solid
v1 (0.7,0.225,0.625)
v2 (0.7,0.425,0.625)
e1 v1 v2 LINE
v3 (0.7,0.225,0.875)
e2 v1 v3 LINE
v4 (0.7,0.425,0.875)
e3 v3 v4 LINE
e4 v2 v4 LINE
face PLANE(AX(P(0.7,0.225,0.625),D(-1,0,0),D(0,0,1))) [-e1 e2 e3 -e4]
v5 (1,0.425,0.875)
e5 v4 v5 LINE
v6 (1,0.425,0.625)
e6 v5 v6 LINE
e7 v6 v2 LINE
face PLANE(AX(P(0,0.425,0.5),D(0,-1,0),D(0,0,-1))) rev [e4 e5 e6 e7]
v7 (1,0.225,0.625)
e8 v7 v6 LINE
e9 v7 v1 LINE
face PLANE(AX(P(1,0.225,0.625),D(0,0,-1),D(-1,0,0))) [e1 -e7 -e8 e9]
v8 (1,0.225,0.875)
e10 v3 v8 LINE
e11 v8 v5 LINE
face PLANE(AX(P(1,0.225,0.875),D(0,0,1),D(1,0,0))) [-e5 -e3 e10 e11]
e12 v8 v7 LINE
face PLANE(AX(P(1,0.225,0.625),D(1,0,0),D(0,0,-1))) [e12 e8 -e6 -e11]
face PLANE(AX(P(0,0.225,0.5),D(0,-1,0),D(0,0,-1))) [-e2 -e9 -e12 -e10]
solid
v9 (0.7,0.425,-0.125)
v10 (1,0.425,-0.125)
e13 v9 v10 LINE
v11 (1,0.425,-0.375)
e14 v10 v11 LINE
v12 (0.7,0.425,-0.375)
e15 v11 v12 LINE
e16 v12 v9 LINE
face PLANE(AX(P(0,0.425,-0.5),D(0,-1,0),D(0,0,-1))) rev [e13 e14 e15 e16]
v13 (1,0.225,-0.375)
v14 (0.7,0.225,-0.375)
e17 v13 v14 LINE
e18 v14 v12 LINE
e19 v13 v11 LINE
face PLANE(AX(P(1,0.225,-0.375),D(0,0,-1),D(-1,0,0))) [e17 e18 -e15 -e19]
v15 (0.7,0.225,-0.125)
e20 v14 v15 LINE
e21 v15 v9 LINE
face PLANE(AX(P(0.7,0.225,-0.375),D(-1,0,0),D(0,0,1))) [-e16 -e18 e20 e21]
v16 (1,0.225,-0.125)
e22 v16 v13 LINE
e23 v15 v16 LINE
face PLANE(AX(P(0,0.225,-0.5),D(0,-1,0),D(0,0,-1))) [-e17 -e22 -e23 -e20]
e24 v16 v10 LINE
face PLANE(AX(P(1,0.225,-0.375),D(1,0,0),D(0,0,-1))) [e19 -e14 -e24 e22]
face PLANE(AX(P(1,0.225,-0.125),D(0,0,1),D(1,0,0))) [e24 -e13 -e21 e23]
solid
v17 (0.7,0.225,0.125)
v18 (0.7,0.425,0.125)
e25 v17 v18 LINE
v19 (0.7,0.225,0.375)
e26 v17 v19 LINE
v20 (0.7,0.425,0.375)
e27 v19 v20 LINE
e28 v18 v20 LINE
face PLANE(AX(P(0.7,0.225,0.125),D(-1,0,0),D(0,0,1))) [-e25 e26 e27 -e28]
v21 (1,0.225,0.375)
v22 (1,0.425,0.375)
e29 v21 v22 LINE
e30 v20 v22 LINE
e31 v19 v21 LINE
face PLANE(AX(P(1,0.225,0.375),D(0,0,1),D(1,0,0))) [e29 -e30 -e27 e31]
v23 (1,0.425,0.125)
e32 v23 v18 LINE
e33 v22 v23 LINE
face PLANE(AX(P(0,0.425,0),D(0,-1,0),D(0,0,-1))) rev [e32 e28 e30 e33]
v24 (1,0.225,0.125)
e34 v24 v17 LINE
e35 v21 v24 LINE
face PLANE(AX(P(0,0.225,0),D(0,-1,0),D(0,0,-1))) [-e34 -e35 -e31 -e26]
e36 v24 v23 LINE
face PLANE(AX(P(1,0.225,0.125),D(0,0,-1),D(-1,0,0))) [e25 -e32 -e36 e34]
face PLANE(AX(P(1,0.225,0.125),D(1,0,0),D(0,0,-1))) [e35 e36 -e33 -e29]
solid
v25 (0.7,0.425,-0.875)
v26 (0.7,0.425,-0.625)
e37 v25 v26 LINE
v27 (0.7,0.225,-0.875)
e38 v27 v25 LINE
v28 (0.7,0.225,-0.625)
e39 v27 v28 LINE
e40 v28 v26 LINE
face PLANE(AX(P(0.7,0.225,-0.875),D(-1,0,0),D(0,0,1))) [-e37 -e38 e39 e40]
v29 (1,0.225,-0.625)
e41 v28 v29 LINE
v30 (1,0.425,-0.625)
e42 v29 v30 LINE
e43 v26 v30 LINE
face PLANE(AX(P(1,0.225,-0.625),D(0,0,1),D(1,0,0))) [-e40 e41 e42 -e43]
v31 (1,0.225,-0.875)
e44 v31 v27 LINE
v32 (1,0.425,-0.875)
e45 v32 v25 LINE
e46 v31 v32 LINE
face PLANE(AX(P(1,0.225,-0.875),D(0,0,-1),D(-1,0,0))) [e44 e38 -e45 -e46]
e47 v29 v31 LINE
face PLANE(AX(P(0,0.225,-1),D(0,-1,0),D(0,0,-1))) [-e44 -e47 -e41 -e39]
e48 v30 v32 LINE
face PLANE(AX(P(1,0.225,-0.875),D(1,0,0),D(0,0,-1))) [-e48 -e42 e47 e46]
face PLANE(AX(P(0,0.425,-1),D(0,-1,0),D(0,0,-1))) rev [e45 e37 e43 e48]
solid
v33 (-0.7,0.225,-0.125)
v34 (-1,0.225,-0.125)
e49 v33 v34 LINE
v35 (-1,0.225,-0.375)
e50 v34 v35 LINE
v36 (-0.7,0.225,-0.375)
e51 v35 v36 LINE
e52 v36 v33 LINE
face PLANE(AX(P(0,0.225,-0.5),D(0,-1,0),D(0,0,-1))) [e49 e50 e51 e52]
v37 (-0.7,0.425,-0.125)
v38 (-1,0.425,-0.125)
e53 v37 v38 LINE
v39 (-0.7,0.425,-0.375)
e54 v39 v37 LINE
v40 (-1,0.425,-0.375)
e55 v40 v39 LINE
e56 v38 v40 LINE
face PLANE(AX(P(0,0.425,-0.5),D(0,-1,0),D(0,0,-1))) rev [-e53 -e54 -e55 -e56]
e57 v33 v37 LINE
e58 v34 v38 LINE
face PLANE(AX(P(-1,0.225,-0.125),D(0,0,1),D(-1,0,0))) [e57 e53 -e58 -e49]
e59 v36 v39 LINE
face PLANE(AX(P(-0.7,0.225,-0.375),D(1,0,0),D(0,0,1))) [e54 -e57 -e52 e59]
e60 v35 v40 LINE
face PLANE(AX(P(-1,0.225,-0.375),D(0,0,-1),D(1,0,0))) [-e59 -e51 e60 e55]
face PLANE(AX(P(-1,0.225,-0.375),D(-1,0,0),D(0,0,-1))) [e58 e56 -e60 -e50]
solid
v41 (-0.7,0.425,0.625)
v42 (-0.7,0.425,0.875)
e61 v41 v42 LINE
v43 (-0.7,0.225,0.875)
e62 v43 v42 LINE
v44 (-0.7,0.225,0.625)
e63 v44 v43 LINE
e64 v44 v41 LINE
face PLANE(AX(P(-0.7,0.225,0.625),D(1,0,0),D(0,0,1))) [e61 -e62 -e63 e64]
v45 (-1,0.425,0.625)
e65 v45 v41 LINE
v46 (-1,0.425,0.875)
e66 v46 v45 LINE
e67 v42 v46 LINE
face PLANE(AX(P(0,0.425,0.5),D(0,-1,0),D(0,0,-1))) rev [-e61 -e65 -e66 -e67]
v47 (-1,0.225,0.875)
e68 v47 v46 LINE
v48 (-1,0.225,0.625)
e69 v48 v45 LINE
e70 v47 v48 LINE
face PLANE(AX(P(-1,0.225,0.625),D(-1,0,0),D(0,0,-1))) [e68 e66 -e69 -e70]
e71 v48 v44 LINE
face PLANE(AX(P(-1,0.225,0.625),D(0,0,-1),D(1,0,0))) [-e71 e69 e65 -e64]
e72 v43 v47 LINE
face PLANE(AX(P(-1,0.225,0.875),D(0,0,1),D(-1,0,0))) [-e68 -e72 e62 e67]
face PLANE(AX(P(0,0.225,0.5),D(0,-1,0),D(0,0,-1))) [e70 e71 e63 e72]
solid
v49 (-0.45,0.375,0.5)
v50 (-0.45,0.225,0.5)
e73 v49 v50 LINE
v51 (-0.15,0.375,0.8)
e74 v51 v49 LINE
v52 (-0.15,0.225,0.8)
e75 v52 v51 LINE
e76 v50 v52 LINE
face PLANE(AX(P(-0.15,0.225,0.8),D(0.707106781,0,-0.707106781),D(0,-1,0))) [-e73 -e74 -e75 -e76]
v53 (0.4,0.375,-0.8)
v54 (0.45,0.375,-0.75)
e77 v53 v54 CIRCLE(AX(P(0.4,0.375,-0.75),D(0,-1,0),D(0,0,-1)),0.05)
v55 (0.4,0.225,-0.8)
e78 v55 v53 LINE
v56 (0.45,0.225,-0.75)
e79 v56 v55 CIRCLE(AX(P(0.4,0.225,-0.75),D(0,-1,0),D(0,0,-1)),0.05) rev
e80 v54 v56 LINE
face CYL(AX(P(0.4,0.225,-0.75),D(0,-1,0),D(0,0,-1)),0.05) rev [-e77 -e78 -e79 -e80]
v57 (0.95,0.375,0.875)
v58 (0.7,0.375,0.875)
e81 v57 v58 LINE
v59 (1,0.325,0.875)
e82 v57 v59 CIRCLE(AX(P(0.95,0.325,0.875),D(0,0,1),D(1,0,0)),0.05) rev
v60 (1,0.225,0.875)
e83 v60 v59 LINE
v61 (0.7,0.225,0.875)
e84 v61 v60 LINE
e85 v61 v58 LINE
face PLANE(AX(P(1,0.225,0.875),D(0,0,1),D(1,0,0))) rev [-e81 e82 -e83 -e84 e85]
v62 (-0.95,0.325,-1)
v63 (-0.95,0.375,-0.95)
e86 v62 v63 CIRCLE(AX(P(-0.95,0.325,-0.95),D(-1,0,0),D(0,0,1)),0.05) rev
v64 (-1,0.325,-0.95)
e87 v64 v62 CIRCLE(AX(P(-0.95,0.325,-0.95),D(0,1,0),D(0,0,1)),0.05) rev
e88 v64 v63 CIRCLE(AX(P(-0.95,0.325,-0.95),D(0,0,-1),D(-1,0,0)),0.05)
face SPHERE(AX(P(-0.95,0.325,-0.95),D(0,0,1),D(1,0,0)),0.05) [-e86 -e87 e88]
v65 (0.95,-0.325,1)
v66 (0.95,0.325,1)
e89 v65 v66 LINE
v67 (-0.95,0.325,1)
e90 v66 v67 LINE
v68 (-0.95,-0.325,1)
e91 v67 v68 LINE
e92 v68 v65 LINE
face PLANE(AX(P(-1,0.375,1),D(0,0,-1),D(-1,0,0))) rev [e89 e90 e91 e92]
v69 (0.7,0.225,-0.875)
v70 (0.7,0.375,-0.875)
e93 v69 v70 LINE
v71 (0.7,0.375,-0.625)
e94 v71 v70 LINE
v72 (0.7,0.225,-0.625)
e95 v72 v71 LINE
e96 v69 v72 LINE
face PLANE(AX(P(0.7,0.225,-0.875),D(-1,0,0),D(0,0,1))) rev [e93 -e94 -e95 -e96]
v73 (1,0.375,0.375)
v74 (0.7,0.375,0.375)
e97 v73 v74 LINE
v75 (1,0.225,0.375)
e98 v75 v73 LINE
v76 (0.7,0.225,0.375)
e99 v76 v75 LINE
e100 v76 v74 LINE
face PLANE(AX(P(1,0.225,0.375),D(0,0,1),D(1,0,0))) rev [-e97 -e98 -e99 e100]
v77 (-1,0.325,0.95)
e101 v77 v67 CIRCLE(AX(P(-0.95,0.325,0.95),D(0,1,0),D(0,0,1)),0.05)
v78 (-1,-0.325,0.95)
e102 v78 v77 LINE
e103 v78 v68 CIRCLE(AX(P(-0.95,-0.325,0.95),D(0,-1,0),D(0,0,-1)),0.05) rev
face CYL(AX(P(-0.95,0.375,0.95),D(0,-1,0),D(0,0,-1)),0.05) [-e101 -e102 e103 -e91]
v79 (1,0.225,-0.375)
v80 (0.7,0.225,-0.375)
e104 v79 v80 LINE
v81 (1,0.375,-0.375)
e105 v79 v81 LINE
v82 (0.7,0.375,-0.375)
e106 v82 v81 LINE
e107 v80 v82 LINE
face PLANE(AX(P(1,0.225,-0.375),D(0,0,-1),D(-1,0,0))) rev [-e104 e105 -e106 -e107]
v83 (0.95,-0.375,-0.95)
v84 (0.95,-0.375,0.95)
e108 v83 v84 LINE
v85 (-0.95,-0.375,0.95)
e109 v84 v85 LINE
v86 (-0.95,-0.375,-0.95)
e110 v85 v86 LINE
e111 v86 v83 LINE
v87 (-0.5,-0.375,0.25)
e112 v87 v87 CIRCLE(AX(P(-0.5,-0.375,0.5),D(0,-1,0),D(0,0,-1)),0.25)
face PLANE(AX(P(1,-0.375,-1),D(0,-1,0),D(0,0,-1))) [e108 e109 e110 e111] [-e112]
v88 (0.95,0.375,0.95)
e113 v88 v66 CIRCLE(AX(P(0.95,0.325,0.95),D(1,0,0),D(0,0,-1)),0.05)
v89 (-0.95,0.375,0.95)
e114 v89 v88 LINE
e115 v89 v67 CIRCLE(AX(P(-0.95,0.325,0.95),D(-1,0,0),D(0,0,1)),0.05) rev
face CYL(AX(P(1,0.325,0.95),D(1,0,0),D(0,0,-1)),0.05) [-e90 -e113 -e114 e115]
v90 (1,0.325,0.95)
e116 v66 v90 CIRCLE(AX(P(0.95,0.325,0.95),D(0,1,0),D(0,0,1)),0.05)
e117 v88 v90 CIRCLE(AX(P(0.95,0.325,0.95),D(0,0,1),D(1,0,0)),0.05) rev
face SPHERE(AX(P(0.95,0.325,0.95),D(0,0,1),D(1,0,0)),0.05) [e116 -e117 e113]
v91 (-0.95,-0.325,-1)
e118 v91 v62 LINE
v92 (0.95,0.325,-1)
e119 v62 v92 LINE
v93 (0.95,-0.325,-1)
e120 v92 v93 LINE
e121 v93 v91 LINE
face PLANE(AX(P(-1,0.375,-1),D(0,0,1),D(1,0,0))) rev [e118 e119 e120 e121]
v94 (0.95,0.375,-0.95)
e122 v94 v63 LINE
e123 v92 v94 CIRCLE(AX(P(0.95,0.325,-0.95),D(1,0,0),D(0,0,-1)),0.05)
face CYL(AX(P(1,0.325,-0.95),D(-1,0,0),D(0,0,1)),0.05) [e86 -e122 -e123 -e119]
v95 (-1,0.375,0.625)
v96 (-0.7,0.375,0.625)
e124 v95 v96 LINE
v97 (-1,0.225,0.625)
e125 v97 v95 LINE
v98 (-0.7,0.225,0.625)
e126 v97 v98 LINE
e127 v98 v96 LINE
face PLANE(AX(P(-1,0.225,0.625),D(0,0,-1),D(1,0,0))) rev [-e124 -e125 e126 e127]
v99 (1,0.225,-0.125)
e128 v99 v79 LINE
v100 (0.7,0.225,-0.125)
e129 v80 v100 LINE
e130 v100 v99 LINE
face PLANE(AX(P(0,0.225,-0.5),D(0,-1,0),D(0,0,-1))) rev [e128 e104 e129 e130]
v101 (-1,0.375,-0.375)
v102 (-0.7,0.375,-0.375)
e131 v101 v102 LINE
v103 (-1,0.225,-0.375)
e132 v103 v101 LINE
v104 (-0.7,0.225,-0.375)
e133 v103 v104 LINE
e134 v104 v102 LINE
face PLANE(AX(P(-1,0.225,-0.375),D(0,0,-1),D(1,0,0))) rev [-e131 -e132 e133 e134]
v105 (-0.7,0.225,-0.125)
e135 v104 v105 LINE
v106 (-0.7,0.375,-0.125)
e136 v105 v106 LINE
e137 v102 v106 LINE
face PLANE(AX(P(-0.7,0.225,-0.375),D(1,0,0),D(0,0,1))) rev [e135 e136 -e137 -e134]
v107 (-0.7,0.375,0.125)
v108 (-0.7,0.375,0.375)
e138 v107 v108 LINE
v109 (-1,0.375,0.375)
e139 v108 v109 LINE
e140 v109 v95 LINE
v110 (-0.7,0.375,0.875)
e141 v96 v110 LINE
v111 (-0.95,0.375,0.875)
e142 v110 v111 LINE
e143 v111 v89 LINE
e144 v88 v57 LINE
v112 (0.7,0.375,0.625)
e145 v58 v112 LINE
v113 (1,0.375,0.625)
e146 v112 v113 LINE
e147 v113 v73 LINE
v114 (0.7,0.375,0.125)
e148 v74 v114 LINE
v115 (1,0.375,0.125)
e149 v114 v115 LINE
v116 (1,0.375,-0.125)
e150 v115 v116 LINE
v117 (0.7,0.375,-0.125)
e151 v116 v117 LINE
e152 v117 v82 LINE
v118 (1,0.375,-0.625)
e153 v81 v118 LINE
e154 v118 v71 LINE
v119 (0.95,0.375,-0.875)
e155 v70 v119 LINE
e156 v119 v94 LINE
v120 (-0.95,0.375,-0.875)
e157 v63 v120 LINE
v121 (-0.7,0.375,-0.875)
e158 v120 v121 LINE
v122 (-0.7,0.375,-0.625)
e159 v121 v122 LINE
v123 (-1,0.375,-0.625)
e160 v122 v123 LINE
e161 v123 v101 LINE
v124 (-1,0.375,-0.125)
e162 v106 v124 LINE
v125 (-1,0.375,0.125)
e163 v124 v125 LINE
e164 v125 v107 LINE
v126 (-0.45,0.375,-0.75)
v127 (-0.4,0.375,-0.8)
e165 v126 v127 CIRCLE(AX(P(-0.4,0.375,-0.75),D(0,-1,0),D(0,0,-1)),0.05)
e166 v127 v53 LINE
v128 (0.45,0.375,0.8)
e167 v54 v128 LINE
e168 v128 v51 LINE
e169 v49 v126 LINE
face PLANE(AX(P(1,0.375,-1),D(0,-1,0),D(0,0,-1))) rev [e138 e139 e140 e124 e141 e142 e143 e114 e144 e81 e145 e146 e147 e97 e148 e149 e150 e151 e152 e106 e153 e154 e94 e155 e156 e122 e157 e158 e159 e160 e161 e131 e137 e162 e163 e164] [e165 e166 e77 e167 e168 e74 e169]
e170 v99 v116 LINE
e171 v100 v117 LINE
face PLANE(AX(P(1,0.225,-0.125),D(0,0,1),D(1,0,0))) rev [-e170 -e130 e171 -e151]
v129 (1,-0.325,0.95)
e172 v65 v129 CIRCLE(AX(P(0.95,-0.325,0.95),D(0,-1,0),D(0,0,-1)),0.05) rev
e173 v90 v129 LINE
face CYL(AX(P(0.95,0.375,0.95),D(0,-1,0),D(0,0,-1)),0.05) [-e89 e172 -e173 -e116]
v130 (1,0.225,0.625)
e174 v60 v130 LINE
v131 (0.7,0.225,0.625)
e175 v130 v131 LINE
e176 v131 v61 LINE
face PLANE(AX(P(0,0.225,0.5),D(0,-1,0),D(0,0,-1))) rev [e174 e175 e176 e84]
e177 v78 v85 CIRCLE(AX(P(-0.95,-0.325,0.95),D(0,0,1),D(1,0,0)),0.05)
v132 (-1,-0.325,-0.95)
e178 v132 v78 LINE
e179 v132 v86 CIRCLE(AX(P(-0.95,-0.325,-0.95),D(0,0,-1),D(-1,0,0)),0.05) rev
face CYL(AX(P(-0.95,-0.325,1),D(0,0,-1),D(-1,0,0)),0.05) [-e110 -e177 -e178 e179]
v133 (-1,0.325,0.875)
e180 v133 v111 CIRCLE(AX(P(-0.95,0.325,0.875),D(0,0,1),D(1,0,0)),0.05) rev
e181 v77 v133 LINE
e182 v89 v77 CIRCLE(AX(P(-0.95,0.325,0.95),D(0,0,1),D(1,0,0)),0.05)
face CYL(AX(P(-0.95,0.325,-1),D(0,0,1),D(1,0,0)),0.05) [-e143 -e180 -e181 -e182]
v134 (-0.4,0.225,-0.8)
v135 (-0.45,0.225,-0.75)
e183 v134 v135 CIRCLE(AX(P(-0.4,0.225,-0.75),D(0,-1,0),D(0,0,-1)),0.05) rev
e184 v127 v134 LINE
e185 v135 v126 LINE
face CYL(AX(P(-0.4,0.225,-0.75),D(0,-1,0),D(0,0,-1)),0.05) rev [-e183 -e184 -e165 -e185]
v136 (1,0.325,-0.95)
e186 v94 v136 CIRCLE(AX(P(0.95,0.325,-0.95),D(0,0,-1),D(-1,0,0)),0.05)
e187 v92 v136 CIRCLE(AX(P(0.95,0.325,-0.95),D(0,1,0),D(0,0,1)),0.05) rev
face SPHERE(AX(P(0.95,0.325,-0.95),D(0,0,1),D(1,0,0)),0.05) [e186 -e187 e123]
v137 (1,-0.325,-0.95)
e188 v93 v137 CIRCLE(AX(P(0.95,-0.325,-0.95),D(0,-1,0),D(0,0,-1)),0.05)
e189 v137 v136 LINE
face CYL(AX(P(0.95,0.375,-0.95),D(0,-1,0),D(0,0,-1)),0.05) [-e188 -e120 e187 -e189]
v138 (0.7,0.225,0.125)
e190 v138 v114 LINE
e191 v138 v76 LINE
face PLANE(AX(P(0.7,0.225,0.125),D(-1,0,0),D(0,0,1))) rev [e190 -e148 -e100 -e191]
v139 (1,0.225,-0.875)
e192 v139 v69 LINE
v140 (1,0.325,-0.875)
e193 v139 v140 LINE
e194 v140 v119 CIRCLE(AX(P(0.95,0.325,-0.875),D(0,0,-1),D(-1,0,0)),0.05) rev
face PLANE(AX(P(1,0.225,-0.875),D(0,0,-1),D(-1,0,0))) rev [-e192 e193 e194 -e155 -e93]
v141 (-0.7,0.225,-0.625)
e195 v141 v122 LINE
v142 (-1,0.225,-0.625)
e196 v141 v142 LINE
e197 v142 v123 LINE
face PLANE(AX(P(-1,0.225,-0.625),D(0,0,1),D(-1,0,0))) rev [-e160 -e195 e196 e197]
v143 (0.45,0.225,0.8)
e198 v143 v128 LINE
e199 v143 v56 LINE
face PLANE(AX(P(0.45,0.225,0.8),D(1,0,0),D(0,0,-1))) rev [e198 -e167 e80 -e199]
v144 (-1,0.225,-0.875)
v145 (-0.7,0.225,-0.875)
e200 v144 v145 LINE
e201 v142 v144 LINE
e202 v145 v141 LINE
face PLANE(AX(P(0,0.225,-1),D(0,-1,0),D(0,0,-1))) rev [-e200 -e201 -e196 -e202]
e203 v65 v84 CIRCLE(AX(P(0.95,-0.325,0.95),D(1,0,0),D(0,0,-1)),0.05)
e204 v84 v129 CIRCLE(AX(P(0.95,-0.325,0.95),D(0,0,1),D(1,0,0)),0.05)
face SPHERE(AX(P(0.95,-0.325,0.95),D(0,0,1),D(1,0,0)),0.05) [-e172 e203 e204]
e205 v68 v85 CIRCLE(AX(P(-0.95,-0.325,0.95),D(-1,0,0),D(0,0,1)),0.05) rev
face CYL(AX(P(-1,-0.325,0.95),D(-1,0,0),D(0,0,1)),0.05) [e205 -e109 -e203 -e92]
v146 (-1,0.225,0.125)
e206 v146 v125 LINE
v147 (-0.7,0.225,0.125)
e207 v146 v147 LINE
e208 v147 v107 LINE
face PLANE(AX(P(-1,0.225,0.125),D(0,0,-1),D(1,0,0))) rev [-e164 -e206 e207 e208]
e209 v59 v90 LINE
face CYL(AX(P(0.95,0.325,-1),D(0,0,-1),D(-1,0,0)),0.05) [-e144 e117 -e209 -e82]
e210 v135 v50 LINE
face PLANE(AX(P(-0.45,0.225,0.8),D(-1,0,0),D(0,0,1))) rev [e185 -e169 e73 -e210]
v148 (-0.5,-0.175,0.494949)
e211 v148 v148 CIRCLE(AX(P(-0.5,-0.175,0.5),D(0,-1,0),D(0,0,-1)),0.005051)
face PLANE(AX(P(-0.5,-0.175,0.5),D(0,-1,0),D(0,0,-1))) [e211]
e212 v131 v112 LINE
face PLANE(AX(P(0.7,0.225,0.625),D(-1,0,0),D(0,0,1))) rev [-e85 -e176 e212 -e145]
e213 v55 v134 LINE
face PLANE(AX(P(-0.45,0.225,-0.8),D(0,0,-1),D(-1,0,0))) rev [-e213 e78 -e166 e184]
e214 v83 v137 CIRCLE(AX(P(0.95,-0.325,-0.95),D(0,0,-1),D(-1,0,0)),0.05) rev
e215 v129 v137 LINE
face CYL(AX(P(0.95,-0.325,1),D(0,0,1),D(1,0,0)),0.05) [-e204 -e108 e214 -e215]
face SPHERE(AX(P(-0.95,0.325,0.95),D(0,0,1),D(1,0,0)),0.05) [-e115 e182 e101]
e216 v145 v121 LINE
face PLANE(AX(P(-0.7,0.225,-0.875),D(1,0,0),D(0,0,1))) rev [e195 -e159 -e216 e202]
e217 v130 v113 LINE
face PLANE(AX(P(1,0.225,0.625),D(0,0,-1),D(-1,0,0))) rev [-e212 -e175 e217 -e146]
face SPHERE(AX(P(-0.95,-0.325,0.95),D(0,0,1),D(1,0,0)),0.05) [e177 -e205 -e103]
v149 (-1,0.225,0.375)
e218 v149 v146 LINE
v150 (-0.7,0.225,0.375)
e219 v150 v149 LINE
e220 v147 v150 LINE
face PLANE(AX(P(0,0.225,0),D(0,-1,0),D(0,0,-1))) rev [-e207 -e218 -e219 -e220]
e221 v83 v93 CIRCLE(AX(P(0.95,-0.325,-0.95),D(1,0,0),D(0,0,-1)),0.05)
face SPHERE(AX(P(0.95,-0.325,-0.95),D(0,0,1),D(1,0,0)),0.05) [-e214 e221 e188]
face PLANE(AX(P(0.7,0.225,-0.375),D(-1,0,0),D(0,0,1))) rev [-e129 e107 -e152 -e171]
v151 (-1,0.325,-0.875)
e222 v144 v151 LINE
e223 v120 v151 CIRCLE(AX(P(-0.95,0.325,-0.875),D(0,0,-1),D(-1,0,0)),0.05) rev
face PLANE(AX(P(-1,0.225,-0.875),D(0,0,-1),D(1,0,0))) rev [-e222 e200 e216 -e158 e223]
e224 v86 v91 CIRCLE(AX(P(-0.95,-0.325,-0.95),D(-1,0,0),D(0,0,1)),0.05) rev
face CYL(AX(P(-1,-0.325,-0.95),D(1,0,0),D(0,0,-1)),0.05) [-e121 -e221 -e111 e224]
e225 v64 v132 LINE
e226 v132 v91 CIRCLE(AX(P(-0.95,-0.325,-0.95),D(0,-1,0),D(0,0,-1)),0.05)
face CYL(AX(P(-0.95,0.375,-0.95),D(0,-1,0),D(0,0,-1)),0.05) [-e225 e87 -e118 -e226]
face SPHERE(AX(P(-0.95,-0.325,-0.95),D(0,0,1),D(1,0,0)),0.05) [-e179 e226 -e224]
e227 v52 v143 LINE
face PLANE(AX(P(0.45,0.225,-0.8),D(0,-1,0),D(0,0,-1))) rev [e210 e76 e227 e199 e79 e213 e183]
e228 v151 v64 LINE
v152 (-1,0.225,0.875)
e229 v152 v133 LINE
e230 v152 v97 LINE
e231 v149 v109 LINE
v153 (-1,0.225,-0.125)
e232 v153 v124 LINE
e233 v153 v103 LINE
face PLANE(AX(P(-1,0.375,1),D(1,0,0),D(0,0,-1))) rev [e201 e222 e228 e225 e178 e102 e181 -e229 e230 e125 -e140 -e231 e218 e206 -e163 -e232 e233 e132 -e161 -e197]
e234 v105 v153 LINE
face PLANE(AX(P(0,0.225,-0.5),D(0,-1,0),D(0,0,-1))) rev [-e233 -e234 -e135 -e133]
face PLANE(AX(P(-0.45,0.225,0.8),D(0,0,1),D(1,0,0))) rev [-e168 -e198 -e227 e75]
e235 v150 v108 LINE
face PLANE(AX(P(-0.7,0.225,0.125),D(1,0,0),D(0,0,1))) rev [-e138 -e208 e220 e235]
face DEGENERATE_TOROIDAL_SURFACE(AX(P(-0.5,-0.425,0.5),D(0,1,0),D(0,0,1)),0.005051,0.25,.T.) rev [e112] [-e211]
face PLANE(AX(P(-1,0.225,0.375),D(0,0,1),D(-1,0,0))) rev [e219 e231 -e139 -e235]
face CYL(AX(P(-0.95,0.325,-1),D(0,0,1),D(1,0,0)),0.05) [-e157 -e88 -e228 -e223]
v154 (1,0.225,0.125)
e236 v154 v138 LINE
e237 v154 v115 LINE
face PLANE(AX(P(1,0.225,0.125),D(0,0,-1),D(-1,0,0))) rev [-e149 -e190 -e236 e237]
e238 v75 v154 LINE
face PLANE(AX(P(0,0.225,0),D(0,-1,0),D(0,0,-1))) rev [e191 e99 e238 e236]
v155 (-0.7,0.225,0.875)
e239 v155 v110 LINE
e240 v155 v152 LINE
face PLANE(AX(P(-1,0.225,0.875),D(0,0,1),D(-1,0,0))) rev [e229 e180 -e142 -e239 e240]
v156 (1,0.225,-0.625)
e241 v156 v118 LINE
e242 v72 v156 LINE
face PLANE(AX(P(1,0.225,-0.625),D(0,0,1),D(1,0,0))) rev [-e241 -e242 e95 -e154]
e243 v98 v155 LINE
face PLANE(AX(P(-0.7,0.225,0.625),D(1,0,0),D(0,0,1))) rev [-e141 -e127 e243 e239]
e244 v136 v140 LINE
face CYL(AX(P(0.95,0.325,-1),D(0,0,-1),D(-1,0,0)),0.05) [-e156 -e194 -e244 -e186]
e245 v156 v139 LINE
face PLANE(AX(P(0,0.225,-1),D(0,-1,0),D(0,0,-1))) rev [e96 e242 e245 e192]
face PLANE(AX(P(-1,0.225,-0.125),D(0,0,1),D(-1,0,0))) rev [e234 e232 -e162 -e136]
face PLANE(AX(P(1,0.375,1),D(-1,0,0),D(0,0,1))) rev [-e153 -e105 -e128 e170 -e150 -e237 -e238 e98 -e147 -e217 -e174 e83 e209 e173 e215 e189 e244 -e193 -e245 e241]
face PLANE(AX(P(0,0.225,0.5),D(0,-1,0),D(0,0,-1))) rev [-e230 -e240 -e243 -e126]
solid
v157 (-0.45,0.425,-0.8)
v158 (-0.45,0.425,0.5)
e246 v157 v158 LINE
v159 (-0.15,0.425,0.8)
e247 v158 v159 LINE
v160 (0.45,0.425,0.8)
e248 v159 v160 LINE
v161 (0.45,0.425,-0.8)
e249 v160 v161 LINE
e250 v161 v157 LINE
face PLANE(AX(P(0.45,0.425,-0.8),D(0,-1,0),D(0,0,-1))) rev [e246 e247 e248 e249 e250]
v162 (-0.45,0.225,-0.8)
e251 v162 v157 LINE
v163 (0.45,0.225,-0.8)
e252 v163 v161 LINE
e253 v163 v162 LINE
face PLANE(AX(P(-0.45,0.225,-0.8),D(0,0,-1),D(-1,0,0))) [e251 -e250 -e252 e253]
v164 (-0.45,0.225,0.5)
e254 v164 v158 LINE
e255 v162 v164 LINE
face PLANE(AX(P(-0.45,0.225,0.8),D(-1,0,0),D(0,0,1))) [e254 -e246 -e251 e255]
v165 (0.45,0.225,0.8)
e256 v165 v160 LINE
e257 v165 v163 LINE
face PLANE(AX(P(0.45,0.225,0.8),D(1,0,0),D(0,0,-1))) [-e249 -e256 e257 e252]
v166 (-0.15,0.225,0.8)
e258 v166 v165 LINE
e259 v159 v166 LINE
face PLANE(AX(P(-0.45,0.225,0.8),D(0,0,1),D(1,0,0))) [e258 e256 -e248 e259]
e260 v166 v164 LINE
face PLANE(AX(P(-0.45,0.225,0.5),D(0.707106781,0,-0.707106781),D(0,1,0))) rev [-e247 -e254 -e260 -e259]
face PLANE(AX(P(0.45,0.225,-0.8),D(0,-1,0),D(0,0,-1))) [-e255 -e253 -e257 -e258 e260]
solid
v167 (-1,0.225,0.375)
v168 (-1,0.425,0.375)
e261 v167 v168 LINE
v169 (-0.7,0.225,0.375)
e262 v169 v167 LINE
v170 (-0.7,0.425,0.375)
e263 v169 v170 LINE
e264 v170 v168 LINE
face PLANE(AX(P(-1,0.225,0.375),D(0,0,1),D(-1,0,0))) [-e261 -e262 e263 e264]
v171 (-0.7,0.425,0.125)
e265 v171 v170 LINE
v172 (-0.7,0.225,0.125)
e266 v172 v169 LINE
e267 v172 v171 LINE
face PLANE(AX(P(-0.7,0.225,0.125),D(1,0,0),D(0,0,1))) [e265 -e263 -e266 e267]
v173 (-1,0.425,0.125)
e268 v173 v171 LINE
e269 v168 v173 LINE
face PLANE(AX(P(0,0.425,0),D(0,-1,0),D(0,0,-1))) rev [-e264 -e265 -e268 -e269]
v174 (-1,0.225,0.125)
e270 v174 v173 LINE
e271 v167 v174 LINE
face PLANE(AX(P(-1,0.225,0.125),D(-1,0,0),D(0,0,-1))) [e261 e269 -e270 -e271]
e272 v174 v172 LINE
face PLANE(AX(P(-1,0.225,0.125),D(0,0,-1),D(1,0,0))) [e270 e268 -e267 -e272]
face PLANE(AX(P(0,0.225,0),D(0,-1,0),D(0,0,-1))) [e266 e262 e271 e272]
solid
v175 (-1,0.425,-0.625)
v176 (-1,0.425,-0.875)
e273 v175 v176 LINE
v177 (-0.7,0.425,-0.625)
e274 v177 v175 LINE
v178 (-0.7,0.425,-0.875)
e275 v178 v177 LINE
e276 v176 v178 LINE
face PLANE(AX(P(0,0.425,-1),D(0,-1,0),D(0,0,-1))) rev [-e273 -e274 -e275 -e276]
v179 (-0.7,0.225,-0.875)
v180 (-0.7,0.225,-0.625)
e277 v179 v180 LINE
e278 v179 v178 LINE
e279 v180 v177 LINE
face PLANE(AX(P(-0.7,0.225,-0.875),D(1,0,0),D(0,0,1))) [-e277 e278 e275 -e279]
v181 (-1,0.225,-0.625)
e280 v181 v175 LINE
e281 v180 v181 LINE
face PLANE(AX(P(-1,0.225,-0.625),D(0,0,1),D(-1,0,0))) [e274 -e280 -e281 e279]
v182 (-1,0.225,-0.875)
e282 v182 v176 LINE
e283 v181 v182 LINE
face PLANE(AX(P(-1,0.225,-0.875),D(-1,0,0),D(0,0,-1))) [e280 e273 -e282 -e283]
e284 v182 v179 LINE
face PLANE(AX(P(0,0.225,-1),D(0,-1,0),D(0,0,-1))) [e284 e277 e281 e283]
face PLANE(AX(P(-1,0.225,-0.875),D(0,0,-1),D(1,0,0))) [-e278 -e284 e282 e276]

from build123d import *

# Parameters (mm, degrees)
SKETCH1_W                   = 2
SKETCH1_H                   = 2
EXTRUDE1_DEPTH              = 0.375
SKETCH3_W                   = 0.9
SKETCH3_H                   = 1.6
EXTRUDE3_DEPTH              = 0.2
BODY_MOVE_COPY2_START       = -0.45
BODY_MOVE_COPY2_OUTLINE_W   = 0.2
BODY_MOVE_COPY2_OUTLINE_H   = 1.6
BODY_MOVE_COPY2_DEPTH       = 0.9
SKETCH4_W                   = 0.3
SKETCH4_H                   = 0.25
BOSS_EXTRUDE1_DEPTH         = 0.2
LPATTERN1_COUNT             = 3
LPATTERN1_PITCH             = 0.5
LPATTERN1_COL_COUNT         = 2
LPATTERN1_COL_PITCH         = 0.5
BODY_MOVE_COPY3_START       = 0.7
BODY_MOVE_COPY3_OUTLINE_W   = 0.2
BODY_MOVE_COPY3_OUTLINE_H   = 0.25
BODY_MOVE_COPY3_DEPTH       = 0.3
BODY_MOVE_COPY3_2_OUTLINE_W = 0.2
BODY_MOVE_COPY3_2_OUTLINE_H = 0.25
BODY_MOVE_COPY3_2_DEPTH     = 0.3
BODY_MOVE_COPY3_3_OUTLINE_W = 0.2
BODY_MOVE_COPY3_3_OUTLINE_H = 0.25
BODY_MOVE_COPY3_3_DEPTH     = 0.3
BODY_MOVE_COPY3_4_OUTLINE_W = 0.2
BODY_MOVE_COPY3_4_OUTLINE_H = 0.25
BODY_MOVE_COPY3_4_DEPTH     = 0.3
BODY_MOVE_COPY3_START_2     = -1
BODY_MOVE_COPY3_5_OUTLINE_W = 0.2
BODY_MOVE_COPY3_5_OUTLINE_H = 0.25
BODY_MOVE_COPY3_5_DEPTH     = 0.3
BODY_MOVE_COPY3_6_OUTLINE_W = 0.2
BODY_MOVE_COPY3_6_OUTLINE_H = 0.25
BODY_MOVE_COPY3_6_DEPTH     = 0.3
BODY_MOVE_COPY3_7_OUTLINE_W = 0.2
BODY_MOVE_COPY3_7_OUTLINE_H = 0.25
BODY_MOVE_COPY3_7_DEPTH     = 0.3
BODY_MOVE_COPY3_8_OUTLINE_W = 0.2
BODY_MOVE_COPY3_8_OUTLINE_H = 0.25
BODY_MOVE_COPY3_8_DEPTH     = 0.3
FILLET_3_R                  = 0.05
FILLET1_R                   = 0.05
SKETCH_1_R                  = 0.25
CUT_EXTRUDE1_DEPTH          = 0.2
FILLET3_R                   = 0.25
CHAMFER1_SIZE               = 0.3
CHAMFER2_SIZE               = 0.3


with BuildPart() as part:
    # Sketch1 → Extrude1 (new, symmetric)
    with BuildSketch(Plane(origin=(0, 0, 0), x_dir=(1, 0, 0), z_dir=(0, 1, 0))):
        Rectangle(SKETCH1_W, SKETCH1_H)
    extrude(amount=EXTRUDE1_DEPTH, both=True)


with BuildPart() as body_2:
    # Sketch3 → Extrude3 (new body)
    with BuildSketch(Plane(origin=(0, 0.425, 0), x_dir=(1, 0, 0), z_dir=(0, 1, 0))):
        Rectangle(SKETCH3_W, SKETCH3_H)
    extrude(amount=-EXTRUDE3_DEPTH)


with BuildPart() as body_3:
    # Body-Move/Copy2: read off the stored shape, not the designer's step
    # Body-Move/Copy2 outline → Body-Move/Copy2 (new body)
    with BuildSketch(Plane.YZ.offset(BODY_MOVE_COPY2_START)):
        with Locations((0.325, 0)):
            Rectangle(BODY_MOVE_COPY2_OUTLINE_W, BODY_MOVE_COPY2_OUTLINE_H)
    extrude(amount=BODY_MOVE_COPY2_DEPTH)

    # Chamfer1
    chamfer1_edges = [body_3.edges().sort_by_distance(p)[0] for p in [
        (-0.45, 0.325, 0.8),
    ]]
    chamfer(chamfer1_edges, length=CHAMFER1_SIZE)


with BuildPart() as part_1:
    add(part.part)

    # Combine2: cut body 2
    add(body_2.part, mode=Mode.SUBTRACT)


with BuildPart() as body_3_2:
    # Sketch4 → Boss-Extrude1 (new body)
    with BuildSketch(Plane(origin=(0, 0.425, 0), x_dir=(-1, 0, 0), z_dir=(0, 1, 0))):
        with Locations((-0.85, 0.25)):
            Rectangle(SKETCH4_W, SKETCH4_H)
    boss_extrude1 = extrude(amount=-BOSS_EXTRUDE1_DEPTH)


with BuildPart() as lpattern1_1:
    # LPattern1: pattern copy
    add(boss_extrude1.moved(Location(Vector(0, 0, -1) * (1 * LPATTERN1_PITCH))))


with BuildPart() as lpattern1_2:
    # LPattern1: pattern copy
    add(boss_extrude1.moved(Location(Vector(0, 0, -1) * (2 * LPATTERN1_PITCH))))


with BuildPart() as lpattern1_col_1:
    # LPattern1 col: Boss-Extrude1 ×2
    with Locations(*[(0, 0, i * LPATTERN1_COL_PITCH) for i in range(1, LPATTERN1_COL_COUNT)]):
        add(boss_extrude1)


with BuildPart() as body_7:
    # Mirror2: mirrored copy
    add(lpattern1_2.part.mirror(Plane(origin=(0, 0, 0), x_dir=(0, 0, 1), z_dir=(1, 0, 0))))


with BuildPart() as body_8:
    # Mirror2 2: mirrored copy
    add(lpattern1_1.part.mirror(Plane(origin=(0, 0, 0), x_dir=(0, 0, 1), z_dir=(1, 0, 0))))


with BuildPart() as body_9:
    # Mirror2 3: mirrored copy
    add(body_3_2.part.mirror(Plane(origin=(0, 0, 0), x_dir=(0, 0, 1), z_dir=(1, 0, 0))))


with BuildPart() as body_10:
    # Mirror2 4: mirrored copy
    add(lpattern1_col_1.part.mirror(Plane(origin=(0, 0, 0), x_dir=(0, 0, 1), z_dir=(1, 0, 0))))


with BuildPart() as body_11:
    # Body-Move/Copy3: read off the stored shape, not the designer's step
    # Body-Move/Copy3 outline → Body-Move/Copy3 (new body)
    with BuildSketch(Plane.YZ.offset(BODY_MOVE_COPY3_START)):
        with Locations((0.325, -0.75)):
            Rectangle(BODY_MOVE_COPY3_OUTLINE_W, BODY_MOVE_COPY3_OUTLINE_H)
    extrude(amount=BODY_MOVE_COPY3_DEPTH)


with BuildPart() as body_12:
    # Body-Move_Copy3 2 outline → Body-Move_Copy3 2 (new body)
    with BuildSketch(Plane.YZ.offset(BODY_MOVE_COPY3_START)):
        with Locations((0.325, -0.25)):
            Rectangle(BODY_MOVE_COPY3_2_OUTLINE_W, BODY_MOVE_COPY3_2_OUTLINE_H)
    extrude(amount=BODY_MOVE_COPY3_2_DEPTH)


with BuildPart() as body_13:
    # Body-Move_Copy3 3 outline → Body-Move_Copy3 3 (new body)
    with BuildSketch(Plane.YZ.offset(BODY_MOVE_COPY3_START)):
        with Locations((0.325, 0.25)):
            Rectangle(BODY_MOVE_COPY3_3_OUTLINE_W, BODY_MOVE_COPY3_3_OUTLINE_H)
    extrude(amount=BODY_MOVE_COPY3_3_DEPTH)


with BuildPart() as body_14:
    # Body-Move_Copy3 4 outline → Body-Move_Copy3 4 (new body)
    with BuildSketch(Plane.YZ.offset(BODY_MOVE_COPY3_START)):
        with Locations((0.325, 0.75)):
            Rectangle(BODY_MOVE_COPY3_4_OUTLINE_W, BODY_MOVE_COPY3_4_OUTLINE_H)
    extrude(amount=BODY_MOVE_COPY3_4_DEPTH)


with BuildPart() as body_15:
    # Body-Move_Copy3 5 outline → Body-Move_Copy3 5 (new body)
    with BuildSketch(Plane.YZ.offset(BODY_MOVE_COPY3_START_2)):
        with Locations((0.325, 0.75)):
            Rectangle(BODY_MOVE_COPY3_5_OUTLINE_W, BODY_MOVE_COPY3_5_OUTLINE_H)
    extrude(amount=BODY_MOVE_COPY3_5_DEPTH)


with BuildPart() as body_16:
    # Body-Move_Copy3 6 outline → Body-Move_Copy3 6 (new body)
    with BuildSketch(Plane.YZ.offset(BODY_MOVE_COPY3_START_2)):
        with Locations((0.325, 0.25)):
            Rectangle(BODY_MOVE_COPY3_6_OUTLINE_W, BODY_MOVE_COPY3_6_OUTLINE_H)
    extrude(amount=BODY_MOVE_COPY3_6_DEPTH)


with BuildPart() as body_17:
    # Body-Move_Copy3 7 outline → Body-Move_Copy3 7 (new body)
    with BuildSketch(Plane.YZ.offset(BODY_MOVE_COPY3_START_2)):
        with Locations((0.325, -0.25)):
            Rectangle(BODY_MOVE_COPY3_7_OUTLINE_W, BODY_MOVE_COPY3_7_OUTLINE_H)
    extrude(amount=BODY_MOVE_COPY3_7_DEPTH)


with BuildPart() as body_18:
    # Body-Move_Copy3 8 outline → Body-Move_Copy3 8 (new body)
    with BuildSketch(Plane.YZ.offset(BODY_MOVE_COPY3_START_2)):
        with Locations((0.325, -0.75)):
            Rectangle(BODY_MOVE_COPY3_8_OUTLINE_W, BODY_MOVE_COPY3_8_OUTLINE_H)
    extrude(amount=BODY_MOVE_COPY3_8_DEPTH)


with BuildPart() as part_2:
    add(part_1.part)

    # Combine4: read off the stored shape, not the designer's step
    # Combine4: cut LPattern1_2, LPattern1_1, body 3 2, LPattern1 col_1, body 10, body 9, body 8, body 7
    add(lpattern1_2.part, mode=Mode.SUBTRACT)
    add(lpattern1_1.part, mode=Mode.SUBTRACT)
    add(body_3_2.part, mode=Mode.SUBTRACT)
    add(lpattern1_col_1.part, mode=Mode.SUBTRACT)
    add(body_10.part, mode=Mode.SUBTRACT)
    add(body_9.part, mode=Mode.SUBTRACT)
    add(body_8.part, mode=Mode.SUBTRACT)
    add(body_7.part, mode=Mode.SUBTRACT)

    # Скругление3
    fillet_3_edges = [part_2.edges().sort_by_distance(p)[0] for p in [
        (0.45, 0.3, -0.8),
        (-0.45, 0.3, -0.8),
    ]]
    fillet(fillet_3_edges, radius=FILLET_3_R)

    # Fillet1
    fillet1_edges = [part_2.edges().sort_by_distance(p)[0] for p in [
        (-1, 0.375, -0.9375),
        (1, 0.375, -0.9375),
        (0, 0.375, 1),
        (1, 0.375, 0.9375),
        (0, -0.375, 1),
        (-1, -0.375, 0),
        (0, -0.375, -1),
        (1, -0.375, 0),
        (0, 0.375, -1),
        (-1, 0.375, 0.9375),
        (1, 0, 1),
        (-1, 0, 1),
        (-1, 0, -1),
        (1, 0, -1),
    ]]
    fillet(fillet1_edges, radius=FILLET1_R)

    # Эскиз1 → Cut-Extrude1 (cut)
    with BuildSketch(Plane.XZ.offset(0.375)):
        with Locations(Location((-0.5, 0.5, 0), (0, 0, 270))):
            Circle(SKETCH_1_R)
    extrude(amount=-CUT_EXTRUDE1_DEPTH, mode=Mode.SUBTRACT)

    # Fillet3
    # the kernel refuses this fillet: 0.25 mm, written as the material it adds along each edge
    with BuildSketch(Plane(origin=(-0.5, -0.175, 0.5), x_dir=(0, 0, -1), z_dir=(-1, 0, 0))) as fillet3_piece_1:
        with BuildLine():
            CenterArc((0.005051026, 0.25), FILLET3_R, 270, 78.463040967)
            Line((0.005051026, 0), (0.005051026, -0.005))
            Line((0.005051026, -0.005), (0.25, -0.005))
            Line((0.25, -0.005), (0.255, 0))
            ThreePointArc((0.255, 0), (0.255, 0.1), (0.254898979, 0.199))
            Line((0.254898979, 0.199), (0.25, 0.2))
        make_face()
    revolve(axis=Axis((-0.5, -0.175, 0.5), (0, -1, 0)))

    # Chamfer2
    chamfer2_edges = [part_2.edges().sort_by_distance(p)[0] for p in [
        (-0.45, 0.3, 0.8),
    ]]
    chamfer(chamfer2_edges, length=CHAMFER2_SIZE)


solid = Compound([body_3.part, body_11.part, body_12.part, body_13.part, body_14.part, body_15.part, body_16.part, body_17.part, body_18.part, part_2.part])
